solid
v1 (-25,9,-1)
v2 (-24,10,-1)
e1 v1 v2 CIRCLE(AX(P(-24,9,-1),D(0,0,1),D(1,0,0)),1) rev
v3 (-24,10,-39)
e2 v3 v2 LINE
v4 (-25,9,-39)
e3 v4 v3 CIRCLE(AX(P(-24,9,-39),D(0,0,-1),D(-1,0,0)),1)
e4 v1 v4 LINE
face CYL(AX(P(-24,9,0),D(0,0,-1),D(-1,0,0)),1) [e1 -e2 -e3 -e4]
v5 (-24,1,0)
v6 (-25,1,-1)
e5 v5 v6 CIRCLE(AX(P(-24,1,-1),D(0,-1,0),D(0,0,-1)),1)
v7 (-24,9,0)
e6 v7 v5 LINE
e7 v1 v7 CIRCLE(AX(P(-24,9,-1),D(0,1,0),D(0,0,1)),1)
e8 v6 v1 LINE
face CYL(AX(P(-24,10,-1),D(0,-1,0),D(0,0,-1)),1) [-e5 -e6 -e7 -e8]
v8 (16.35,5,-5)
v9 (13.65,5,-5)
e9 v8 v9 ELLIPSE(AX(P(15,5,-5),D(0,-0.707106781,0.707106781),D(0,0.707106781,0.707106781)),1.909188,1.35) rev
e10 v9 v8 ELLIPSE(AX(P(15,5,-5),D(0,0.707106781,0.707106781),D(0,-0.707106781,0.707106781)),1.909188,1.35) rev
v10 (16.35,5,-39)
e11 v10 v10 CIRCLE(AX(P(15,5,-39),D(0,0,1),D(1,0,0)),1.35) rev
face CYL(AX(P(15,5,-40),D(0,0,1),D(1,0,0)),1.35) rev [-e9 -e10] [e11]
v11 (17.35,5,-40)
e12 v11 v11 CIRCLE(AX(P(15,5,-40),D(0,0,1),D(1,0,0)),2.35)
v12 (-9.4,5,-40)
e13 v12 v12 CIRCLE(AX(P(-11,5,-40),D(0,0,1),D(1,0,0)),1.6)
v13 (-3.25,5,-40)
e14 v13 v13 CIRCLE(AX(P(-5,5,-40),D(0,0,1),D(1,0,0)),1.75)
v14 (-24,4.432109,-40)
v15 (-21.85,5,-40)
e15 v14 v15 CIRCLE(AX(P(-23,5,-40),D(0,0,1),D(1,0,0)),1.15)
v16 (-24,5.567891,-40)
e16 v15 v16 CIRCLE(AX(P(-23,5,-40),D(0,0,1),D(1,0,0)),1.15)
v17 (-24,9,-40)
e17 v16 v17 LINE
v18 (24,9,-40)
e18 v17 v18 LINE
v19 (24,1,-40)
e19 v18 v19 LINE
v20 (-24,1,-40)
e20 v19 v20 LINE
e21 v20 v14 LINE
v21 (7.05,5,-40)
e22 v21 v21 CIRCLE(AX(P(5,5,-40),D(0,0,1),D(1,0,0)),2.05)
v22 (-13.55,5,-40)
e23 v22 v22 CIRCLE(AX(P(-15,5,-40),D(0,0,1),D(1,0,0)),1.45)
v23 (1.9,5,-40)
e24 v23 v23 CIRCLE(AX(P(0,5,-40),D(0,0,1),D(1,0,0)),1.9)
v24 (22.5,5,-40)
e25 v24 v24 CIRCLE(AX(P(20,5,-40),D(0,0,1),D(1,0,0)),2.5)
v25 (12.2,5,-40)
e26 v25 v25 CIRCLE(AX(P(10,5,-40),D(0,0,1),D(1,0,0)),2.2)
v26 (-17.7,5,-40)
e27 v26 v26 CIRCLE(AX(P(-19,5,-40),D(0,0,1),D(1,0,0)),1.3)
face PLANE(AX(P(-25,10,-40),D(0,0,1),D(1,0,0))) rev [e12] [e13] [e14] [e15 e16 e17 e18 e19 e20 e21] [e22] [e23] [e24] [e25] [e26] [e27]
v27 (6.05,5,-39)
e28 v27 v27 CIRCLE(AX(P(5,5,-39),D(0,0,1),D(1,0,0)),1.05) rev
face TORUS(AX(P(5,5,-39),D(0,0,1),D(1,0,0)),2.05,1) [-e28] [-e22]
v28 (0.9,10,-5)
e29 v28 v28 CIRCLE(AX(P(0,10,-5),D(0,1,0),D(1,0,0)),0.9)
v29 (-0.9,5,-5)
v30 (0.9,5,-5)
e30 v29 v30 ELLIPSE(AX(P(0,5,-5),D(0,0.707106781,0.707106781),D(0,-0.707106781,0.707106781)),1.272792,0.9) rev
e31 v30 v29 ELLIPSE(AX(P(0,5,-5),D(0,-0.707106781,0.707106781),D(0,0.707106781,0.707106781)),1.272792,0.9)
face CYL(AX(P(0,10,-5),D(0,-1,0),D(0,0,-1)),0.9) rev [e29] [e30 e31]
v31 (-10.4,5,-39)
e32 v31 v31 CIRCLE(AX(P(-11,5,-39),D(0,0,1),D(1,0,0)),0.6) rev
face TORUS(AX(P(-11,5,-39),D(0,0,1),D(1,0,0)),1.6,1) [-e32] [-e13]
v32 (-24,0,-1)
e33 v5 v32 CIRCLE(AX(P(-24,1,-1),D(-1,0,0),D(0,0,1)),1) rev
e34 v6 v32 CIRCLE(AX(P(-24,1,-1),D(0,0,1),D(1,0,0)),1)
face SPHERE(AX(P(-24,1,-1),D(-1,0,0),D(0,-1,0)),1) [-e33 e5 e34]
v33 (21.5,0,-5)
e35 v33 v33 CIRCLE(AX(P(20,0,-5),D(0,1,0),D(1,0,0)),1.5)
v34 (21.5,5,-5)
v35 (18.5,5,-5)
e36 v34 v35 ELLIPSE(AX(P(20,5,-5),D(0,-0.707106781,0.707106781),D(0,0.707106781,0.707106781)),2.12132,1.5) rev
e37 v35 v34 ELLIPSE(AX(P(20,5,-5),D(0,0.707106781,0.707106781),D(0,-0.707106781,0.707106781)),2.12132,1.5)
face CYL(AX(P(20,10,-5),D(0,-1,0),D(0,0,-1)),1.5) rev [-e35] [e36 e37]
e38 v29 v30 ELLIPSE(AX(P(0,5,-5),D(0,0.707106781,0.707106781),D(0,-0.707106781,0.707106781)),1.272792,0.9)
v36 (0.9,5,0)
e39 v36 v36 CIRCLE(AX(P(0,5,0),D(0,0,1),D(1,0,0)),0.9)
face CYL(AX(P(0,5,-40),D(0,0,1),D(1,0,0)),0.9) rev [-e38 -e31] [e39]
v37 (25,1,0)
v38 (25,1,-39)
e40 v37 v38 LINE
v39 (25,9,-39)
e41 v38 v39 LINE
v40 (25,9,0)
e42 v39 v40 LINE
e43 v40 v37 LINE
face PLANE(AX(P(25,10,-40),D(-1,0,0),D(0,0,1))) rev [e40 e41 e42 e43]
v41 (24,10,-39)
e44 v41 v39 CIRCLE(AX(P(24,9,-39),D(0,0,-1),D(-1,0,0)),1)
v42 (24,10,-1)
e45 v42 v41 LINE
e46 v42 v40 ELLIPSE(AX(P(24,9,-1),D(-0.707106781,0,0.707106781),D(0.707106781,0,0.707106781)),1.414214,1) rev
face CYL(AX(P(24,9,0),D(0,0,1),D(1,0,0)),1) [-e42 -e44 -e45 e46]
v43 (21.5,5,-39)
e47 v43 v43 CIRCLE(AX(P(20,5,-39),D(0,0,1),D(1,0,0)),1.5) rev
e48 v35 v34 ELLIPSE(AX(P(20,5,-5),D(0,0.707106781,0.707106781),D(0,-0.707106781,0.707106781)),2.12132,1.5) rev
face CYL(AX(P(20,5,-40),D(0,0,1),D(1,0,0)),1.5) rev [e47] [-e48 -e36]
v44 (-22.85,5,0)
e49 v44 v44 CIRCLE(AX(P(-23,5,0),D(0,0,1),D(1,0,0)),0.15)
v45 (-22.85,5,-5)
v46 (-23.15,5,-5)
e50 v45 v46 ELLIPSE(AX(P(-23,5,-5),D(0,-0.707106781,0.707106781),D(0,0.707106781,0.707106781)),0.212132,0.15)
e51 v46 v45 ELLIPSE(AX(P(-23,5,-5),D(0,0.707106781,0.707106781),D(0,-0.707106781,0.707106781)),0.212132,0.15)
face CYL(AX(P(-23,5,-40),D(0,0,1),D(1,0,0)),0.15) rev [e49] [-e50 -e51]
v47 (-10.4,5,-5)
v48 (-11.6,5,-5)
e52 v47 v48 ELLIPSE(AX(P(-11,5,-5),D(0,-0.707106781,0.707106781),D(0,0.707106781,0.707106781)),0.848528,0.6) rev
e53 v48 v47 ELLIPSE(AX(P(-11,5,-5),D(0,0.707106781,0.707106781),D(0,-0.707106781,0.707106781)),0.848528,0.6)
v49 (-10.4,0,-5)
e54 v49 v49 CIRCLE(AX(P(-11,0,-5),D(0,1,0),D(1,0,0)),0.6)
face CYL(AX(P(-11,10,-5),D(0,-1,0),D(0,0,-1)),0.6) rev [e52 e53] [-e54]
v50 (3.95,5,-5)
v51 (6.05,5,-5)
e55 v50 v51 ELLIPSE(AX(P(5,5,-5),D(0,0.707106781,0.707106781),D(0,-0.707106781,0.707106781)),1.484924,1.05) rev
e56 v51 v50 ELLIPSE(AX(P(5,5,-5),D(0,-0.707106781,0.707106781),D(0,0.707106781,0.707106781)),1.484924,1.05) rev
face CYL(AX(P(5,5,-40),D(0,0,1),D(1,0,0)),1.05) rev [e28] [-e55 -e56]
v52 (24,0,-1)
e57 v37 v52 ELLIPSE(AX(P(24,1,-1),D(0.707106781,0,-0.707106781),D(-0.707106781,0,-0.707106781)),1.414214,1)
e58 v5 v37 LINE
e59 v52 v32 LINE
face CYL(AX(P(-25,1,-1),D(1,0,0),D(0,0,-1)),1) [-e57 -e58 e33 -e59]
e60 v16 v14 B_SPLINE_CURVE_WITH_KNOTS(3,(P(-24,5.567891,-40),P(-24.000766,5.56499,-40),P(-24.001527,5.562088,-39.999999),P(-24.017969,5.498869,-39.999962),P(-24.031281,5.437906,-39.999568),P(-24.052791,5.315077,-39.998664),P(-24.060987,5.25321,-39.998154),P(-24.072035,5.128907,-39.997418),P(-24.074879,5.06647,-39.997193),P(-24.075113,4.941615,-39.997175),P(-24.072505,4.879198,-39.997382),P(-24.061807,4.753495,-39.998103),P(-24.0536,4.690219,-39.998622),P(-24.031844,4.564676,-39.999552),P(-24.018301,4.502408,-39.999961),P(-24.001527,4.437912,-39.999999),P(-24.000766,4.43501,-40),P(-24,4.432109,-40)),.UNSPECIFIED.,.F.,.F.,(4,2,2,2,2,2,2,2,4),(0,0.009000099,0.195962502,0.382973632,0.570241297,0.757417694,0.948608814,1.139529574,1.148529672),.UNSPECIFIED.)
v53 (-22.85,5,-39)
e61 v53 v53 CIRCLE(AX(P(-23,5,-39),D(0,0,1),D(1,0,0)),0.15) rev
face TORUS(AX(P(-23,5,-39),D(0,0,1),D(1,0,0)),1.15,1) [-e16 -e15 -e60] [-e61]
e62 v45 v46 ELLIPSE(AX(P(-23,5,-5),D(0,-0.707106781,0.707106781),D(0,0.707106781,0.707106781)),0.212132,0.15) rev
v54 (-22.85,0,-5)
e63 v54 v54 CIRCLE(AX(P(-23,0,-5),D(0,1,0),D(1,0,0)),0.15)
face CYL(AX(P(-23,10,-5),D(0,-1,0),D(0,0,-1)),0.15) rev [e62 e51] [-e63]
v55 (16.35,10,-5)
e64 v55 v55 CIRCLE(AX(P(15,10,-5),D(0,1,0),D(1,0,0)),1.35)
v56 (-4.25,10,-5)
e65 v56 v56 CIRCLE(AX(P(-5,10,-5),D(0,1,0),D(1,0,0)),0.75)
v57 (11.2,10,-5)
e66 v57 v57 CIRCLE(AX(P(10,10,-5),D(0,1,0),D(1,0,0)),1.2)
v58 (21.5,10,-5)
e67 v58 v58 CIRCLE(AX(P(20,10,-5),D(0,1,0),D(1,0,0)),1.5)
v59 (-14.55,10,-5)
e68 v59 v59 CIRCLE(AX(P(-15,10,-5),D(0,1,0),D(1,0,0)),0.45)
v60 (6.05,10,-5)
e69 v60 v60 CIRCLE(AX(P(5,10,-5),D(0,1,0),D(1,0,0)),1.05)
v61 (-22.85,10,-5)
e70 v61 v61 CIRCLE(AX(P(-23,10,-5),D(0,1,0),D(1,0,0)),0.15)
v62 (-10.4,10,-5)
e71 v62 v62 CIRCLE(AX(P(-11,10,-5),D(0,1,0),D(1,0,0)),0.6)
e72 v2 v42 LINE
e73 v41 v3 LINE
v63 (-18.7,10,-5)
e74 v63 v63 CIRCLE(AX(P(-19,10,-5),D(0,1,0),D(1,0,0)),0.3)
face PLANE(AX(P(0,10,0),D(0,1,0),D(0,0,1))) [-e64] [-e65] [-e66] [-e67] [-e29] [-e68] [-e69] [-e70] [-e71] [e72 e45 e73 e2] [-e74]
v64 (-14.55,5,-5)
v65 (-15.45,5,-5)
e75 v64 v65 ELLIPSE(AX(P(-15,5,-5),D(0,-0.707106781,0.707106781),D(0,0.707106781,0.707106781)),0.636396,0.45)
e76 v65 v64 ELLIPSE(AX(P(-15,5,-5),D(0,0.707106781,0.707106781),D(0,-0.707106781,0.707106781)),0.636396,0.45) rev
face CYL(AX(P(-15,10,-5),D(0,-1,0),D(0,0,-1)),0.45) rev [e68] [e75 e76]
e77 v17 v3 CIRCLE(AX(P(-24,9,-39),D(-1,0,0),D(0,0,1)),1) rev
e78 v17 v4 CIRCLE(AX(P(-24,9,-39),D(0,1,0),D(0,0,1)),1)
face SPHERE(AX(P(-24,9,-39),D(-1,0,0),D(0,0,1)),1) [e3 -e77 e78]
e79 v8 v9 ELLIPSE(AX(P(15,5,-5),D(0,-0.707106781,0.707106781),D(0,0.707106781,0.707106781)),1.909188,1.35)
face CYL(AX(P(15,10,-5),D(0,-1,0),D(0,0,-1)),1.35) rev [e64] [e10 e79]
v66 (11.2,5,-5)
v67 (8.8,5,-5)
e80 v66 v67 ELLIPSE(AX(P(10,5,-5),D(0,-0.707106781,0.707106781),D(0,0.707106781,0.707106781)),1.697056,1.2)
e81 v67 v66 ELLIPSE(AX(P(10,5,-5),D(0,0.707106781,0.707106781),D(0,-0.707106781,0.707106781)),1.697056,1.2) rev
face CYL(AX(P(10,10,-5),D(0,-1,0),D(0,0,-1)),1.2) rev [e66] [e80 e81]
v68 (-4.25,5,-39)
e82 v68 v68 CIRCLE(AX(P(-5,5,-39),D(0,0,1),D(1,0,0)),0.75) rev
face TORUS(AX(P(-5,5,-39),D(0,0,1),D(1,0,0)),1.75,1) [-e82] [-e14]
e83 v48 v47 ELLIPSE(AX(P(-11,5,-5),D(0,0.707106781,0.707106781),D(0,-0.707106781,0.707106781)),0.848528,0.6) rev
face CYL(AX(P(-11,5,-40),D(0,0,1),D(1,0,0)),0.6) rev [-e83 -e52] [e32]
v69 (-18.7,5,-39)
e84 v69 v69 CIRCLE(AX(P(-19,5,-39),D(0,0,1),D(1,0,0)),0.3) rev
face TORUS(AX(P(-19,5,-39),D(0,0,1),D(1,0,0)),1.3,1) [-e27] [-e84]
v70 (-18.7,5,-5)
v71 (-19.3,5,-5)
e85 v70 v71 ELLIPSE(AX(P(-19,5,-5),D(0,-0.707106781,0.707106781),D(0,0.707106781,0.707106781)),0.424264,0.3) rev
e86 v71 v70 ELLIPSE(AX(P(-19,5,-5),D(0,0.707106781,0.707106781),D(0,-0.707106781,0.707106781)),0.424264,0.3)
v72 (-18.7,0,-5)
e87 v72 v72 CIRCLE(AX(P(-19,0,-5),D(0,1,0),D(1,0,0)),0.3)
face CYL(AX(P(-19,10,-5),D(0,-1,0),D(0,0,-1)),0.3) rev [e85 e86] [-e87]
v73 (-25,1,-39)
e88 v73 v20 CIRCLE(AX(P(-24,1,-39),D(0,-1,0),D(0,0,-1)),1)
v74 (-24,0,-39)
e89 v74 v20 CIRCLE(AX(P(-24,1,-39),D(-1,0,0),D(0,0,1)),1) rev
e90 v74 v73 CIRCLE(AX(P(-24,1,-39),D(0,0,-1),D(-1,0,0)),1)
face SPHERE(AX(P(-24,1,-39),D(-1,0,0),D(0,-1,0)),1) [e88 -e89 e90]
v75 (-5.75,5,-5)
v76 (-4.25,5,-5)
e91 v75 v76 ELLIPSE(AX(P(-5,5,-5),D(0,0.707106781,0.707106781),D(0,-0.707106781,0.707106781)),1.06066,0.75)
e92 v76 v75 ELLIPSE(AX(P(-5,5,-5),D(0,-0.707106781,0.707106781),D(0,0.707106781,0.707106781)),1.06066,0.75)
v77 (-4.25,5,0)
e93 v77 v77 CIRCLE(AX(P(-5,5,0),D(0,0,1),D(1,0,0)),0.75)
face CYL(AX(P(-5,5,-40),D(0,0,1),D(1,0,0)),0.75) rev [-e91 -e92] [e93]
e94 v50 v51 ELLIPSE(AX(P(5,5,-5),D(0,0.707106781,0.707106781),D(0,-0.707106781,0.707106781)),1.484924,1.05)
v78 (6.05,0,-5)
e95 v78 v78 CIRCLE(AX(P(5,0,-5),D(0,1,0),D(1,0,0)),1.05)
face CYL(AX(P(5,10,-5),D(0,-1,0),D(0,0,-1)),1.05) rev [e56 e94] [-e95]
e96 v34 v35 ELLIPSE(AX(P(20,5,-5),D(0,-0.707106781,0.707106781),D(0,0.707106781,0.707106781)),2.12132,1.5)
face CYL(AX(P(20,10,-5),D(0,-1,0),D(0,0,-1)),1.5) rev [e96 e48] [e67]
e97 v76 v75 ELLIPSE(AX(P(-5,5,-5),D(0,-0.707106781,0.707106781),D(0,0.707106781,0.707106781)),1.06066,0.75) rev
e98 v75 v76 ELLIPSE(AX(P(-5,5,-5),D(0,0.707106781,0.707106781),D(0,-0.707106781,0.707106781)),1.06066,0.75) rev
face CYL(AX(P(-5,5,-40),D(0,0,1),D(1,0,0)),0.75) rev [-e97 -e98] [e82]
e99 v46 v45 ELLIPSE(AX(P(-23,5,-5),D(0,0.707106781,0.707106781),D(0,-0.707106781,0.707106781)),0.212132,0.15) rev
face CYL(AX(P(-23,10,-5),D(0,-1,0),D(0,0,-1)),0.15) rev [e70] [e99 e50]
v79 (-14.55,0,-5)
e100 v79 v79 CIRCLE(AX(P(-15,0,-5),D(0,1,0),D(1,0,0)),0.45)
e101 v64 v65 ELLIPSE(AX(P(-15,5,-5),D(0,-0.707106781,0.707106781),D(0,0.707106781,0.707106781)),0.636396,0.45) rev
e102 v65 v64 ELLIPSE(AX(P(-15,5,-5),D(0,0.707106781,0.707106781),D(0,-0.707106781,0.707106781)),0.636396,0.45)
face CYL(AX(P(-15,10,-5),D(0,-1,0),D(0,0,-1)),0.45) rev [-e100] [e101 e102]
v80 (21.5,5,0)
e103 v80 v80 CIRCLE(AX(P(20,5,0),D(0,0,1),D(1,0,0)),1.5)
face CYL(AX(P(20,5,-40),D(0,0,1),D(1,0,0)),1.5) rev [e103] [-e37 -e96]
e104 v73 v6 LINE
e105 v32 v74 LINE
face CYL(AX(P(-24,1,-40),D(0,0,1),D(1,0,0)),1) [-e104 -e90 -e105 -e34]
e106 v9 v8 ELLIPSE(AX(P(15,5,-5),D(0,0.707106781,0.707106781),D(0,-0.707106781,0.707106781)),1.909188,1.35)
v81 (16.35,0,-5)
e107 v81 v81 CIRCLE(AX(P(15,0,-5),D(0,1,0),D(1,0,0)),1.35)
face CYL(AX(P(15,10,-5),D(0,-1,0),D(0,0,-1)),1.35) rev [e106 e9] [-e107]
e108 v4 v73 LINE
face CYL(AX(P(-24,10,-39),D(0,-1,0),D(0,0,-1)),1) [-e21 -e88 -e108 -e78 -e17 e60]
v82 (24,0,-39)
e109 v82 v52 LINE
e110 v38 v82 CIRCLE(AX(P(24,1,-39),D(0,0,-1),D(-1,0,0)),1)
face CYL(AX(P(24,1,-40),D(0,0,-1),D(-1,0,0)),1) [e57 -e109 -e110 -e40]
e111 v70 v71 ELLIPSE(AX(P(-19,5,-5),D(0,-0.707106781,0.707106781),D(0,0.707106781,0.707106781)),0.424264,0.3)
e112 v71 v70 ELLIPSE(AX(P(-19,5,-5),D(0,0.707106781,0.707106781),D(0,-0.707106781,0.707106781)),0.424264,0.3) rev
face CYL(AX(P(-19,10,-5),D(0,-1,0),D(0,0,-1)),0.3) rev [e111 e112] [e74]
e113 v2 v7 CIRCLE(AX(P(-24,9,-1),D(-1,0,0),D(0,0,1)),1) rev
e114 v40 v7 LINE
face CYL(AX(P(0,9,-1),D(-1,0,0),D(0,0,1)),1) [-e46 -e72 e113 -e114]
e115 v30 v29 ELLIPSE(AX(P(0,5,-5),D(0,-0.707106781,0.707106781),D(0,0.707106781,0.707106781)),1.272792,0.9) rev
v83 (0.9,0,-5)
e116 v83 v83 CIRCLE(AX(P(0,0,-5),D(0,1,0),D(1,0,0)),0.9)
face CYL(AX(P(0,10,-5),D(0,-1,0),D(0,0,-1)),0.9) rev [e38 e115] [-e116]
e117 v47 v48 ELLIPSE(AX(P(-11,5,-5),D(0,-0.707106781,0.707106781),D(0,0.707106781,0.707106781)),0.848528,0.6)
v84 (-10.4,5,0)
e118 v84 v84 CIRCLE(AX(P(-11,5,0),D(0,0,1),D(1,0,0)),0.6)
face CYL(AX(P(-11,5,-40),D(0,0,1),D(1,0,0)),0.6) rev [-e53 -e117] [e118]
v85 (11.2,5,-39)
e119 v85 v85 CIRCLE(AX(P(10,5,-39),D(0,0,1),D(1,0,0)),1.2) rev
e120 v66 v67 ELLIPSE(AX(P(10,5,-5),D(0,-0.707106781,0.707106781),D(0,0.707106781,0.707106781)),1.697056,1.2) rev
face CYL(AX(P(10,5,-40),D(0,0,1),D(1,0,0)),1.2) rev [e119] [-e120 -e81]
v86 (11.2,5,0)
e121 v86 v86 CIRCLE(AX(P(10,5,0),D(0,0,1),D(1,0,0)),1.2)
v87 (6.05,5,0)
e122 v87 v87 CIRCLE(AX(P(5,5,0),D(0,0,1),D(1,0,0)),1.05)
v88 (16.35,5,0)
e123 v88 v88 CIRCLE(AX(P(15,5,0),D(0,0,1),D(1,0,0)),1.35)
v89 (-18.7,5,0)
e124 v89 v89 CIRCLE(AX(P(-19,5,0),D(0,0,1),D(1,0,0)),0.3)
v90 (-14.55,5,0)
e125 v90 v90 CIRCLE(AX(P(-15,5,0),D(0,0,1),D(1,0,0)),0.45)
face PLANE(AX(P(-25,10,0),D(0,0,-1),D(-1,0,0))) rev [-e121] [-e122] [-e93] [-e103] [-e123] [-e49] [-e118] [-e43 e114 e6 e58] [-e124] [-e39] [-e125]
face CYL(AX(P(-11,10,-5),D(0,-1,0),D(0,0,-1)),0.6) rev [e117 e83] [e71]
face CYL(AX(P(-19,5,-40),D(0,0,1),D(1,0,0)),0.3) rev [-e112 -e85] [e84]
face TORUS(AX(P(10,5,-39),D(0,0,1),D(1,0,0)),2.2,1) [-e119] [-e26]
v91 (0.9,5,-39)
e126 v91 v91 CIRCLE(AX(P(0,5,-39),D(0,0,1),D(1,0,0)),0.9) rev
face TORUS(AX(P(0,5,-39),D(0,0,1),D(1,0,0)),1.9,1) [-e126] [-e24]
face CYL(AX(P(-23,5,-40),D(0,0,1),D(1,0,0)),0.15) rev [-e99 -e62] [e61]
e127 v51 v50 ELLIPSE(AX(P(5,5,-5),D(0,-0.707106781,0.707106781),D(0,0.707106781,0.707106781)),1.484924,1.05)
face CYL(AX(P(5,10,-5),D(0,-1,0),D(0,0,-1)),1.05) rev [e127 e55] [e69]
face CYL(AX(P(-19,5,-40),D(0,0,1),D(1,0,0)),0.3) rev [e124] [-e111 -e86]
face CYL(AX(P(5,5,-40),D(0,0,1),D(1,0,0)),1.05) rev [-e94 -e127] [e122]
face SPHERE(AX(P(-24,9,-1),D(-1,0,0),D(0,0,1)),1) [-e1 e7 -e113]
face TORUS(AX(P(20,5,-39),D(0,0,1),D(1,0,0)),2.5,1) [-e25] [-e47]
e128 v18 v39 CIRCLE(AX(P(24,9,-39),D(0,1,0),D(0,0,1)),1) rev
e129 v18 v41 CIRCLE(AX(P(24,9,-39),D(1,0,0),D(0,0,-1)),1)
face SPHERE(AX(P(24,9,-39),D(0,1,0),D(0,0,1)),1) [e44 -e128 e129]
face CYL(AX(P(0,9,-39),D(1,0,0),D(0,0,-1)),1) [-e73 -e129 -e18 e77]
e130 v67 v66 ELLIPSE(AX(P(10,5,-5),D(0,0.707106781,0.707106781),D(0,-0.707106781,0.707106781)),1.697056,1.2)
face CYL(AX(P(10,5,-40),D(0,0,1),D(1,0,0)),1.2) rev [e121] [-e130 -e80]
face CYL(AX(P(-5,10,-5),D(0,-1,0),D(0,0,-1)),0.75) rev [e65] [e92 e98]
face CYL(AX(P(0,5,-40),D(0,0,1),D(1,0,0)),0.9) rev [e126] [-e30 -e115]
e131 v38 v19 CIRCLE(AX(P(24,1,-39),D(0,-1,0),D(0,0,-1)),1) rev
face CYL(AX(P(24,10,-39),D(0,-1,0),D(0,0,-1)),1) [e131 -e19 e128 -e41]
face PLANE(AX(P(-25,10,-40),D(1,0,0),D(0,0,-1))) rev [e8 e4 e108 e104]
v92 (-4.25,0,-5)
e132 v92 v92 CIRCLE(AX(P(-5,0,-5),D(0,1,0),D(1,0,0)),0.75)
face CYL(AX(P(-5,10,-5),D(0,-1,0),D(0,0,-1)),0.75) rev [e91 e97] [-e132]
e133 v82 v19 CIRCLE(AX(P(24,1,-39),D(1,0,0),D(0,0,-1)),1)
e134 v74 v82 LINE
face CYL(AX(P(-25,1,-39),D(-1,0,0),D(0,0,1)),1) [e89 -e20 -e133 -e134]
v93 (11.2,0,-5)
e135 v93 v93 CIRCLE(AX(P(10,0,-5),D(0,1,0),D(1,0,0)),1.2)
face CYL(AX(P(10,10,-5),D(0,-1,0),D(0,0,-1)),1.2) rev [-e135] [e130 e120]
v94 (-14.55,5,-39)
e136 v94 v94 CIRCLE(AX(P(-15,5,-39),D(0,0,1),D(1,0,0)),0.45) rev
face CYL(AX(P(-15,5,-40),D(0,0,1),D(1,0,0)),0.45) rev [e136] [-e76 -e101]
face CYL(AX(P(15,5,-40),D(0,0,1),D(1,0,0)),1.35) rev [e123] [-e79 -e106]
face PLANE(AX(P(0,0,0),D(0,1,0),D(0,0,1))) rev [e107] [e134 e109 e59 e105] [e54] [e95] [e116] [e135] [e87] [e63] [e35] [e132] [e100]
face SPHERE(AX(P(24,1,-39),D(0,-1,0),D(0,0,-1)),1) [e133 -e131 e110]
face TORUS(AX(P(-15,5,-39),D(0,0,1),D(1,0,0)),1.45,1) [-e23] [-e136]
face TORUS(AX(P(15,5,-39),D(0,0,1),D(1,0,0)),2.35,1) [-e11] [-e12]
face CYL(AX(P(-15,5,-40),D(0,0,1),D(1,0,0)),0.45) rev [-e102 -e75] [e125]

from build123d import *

# Parameters (mm, degrees)
SKETCH1_W                 = 50
SKETCH1_H                 = 40
BOSS_EXTRUDE1_DEPTH       = 10
CUT_EXTRUDE1_START        = -40
CUT_EXTRUDE1_OUTLINE_R    = 0.3
CUT_EXTRUDE1_OUTLINE_R_2  = 0.45
CUT_EXTRUDE1_OUTLINE_R_3  = 0.6
CUT_EXTRUDE1_OUTLINE_R_4  = 0.75
CUT_EXTRUDE1_OUTLINE_R_5  = 0.9
CUT_EXTRUDE1_OUTLINE_R_6  = 1.05
CUT_EXTRUDE1_OUTLINE_R_7  = 1.35
CUT_EXTRUDE1_OUTLINE_R_8  = 1.5
CUT_EXTRUDE1_OUTLINE_R_9  = 1.2
CUT_EXTRUDE1_OUTLINE_R_10 = 0.15
CUT_EXTRUDE1_DEPTH        = 40
FILLET1_R                 = 1


# Read off the part's stored shape, not the designer's step: Cut-Extrude1
with BuildPart() as part:
    # Sketch1 → Boss-Extrude1 (new body)
    with BuildSketch(Plane(origin=(0, 0, 0), x_dir=(1, 0, 0), z_dir=(0, 1, 0))):
        with Locations((0, 20)):
            Rectangle(SKETCH1_W, SKETCH1_H)
    extrude(amount=BOSS_EXTRUDE1_DEPTH)

    # Cut-Extrude1 outline → Cut-Extrude1 (cut)
    with BuildSketch(Plane.XY.offset(CUT_EXTRUDE1_START)):
        with Locations((-19, 5)):
            Circle(CUT_EXTRUDE1_OUTLINE_R)
        with Locations((-15, 5)):
            Circle(CUT_EXTRUDE1_OUTLINE_R_2)
        with Locations((-11, 5)):
            Circle(CUT_EXTRUDE1_OUTLINE_R_3)
        with Locations((-5, 5)):
            Circle(CUT_EXTRUDE1_OUTLINE_R_4)
        with Locations((0, 5)):
            Circle(CUT_EXTRUDE1_OUTLINE_R_5)
        with Locations((5, 5)):
            Circle(CUT_EXTRUDE1_OUTLINE_R_6)
        with Locations((15, 5)):
            Circle(CUT_EXTRUDE1_OUTLINE_R_7)
        with Locations((20, 5)):
            Circle(CUT_EXTRUDE1_OUTLINE_R_8)
        with Locations((10, 5)):
            Circle(CUT_EXTRUDE1_OUTLINE_R_9)
        with Locations((-23, 5)):
            Circle(CUT_EXTRUDE1_OUTLINE_R_10)
    cut_extrude1 = extrude(amount=CUT_EXTRUDE1_DEPTH, mode=Mode.SUBTRACT)

    # Mirror1: Cut-Extrude1 across plane
    add(cut_extrude1.mirror(Plane(origin=(0, 0, 0), x_dir=(0, -0.7071067811865478, 0.7071067811865472), z_dir=(0, 0.7071067811865475, 0.7071067811865477))), mode=Mode.SUBTRACT)

    # Fillet1
    # the kernel refuses this fillet: 1 mm, written as the material it takes off along each edge
    with BuildSketch(Plane(origin=(24, 9, -39), x_dir=(0, 1, 0), z_dir=(0, 0, -1))) as fillet1_piece_1_section:
        Polygon((0, 0), (FILLET1_R, 0), (FILLET1_R, FILLET1_R), (0, FILLET1_R), align=None)
    fillet1_piece_1 = extrude(amount=FILLET1_R, mode=Mode.PRIVATE)
    fillet1_piece_1 = fillet1_piece_1 - Plane(origin=(24, 9, -39), x_dir=(-0.7071067811865475, -0.7071067811865475, 0), z_dir=(0, 0, -1)) * Sphere(FILLET1_R, mode=Mode.PRIVATE)
    add(fillet1_piece_1, mode=Mode.SUBTRACT)
    with BuildSketch(Plane(origin=(-24, 9, -39), x_dir=(-1, 0, 0), z_dir=(0, 0, -1))) as fillet1_piece_2_section:
        Polygon((0, 0), (FILLET1_R, 0), (FILLET1_R, FILLET1_R), (0, FILLET1_R), align=None)
    fillet1_piece_2 = extrude(amount=FILLET1_R, mode=Mode.PRIVATE)
    fillet1_piece_2 = fillet1_piece_2 - Plane(origin=(-24, 9, -39), x_dir=(0.7071067811865475, -0.7071067811865475, 0), z_dir=(0, 0, -1)) * Sphere(FILLET1_R, mode=Mode.PRIVATE)
    add(fillet1_piece_2, mode=Mode.SUBTRACT)
    with BuildSketch(Plane(origin=(-24, 9, -1), x_dir=(0, 1, 0), z_dir=(-1, 0, 0))) as fillet1_piece_3_section:
        Polygon((0, 0), (FILLET1_R, 0), (FILLET1_R, -FILLET1_R), (0, -FILLET1_R), align=None)
    fillet1_piece_3 = extrude(amount=FILLET1_R, mode=Mode.PRIVATE)
    fillet1_piece_3 = fillet1_piece_3 - Plane(origin=(-24, 9, -1), x_dir=(0, -0.7071067811865475, -0.7071067811865475), z_dir=(-1, 0, 0)) * Sphere(FILLET1_R, mode=Mode.PRIVATE)
    add(fillet1_piece_3, mode=Mode.SUBTRACT)
    with BuildSketch(Plane(origin=(-24, 1, -39), x_dir=(-1, 0, 0), z_dir=(0, 0, -1))) as fillet1_piece_4_section:
        Polygon((0, 0), (FILLET1_R, 0), (FILLET1_R, -FILLET1_R), (0, -FILLET1_R), align=None)
    fillet1_piece_4 = extrude(amount=FILLET1_R, mode=Mode.PRIVATE)
    fillet1_piece_4 = fillet1_piece_4 - Plane(origin=(-24, 1, -39), x_dir=(0.7071067811865475, 0.7071067811865475, 0), z_dir=(0, 0, -1)) * Sphere(FILLET1_R, mode=Mode.PRIVATE)
    add(fillet1_piece_4, mode=Mode.SUBTRACT)
    with BuildSketch(Plane(origin=(24, 1, -39), x_dir=(0, -1, 0), z_dir=(0, 0, -1))) as fillet1_piece_5_section:
        Polygon((0, 0), (FILLET1_R, 0), (FILLET1_R, -FILLET1_R), (0, -FILLET1_R), align=None)
    fillet1_piece_5 = extrude(amount=FILLET1_R, mode=Mode.PRIVATE)
    fillet1_piece_5 = fillet1_piece_5 - Plane(origin=(24, 1, -39), x_dir=(-0.7071067811865475, 0.7071067811865475, 0), z_dir=(0, 0, -1)) * Sphere(FILLET1_R, mode=Mode.PRIVATE)
    add(fillet1_piece_5, mode=Mode.SUBTRACT)
    with BuildSketch(Plane(origin=(-24, 1, -1), x_dir=(0, -1, 0), z_dir=(-1, 0, 0))) as fillet1_piece_6_section:
        Polygon((0, 0), (FILLET1_R, 0), (FILLET1_R, FILLET1_R), (0, FILLET1_R), align=None)
    fillet1_piece_6 = extrude(amount=FILLET1_R, mode=Mode.PRIVATE)
    fillet1_piece_6 = fillet1_piece_6 - Plane(origin=(-24, 1, -1), x_dir=(0, 0.7071067811865475, -0.7071067811865475), z_dir=(-1, 0, 0)) * Sphere(FILLET1_R, mode=Mode.PRIVATE)
    add(fillet1_piece_6, mode=Mode.SUBTRACT)
    with BuildSketch(Plane(origin=(25, 10, -39), x_dir=(-1, 0, 0), z_dir=(0, 0, 1))) as fillet1_piece_7:
        with BuildLine():
            CenterArc((FILLET1_R, FILLET1_R), FILLET1_R, 180, 90)
            Line((0, FILLET1_R), (0, 0))
            Line((0, 0), (FILLET1_R, 0))
        make_face()
    extrude(amount=41.5, mode=Mode.SUBTRACT)
    with BuildSketch(Plane(origin=(-24, 10, -40), x_dir=(0, -1, 0), z_dir=(1, 0, 0))) as fillet1_piece_8:
        with BuildLine():
            CenterArc((FILLET1_R, -FILLET1_R), FILLET1_R, 90, 90)
            Line((0, -FILLET1_R), (0, 0))
            Line((0, 0), (FILLET1_R, 0))
        make_face()
    extrude(amount=48, mode=Mode.SUBTRACT)
    with BuildSketch(Plane(origin=(-23, 5, -40), x_dir=(1, 0, 0), z_dir=(0, -1, 0))) as fillet1_piece_9:
        with BuildLine():
            CenterArc((0.15 + FILLET1_R, FILLET1_R), FILLET1_R, 180, 90)
            Line((0.15, FILLET1_R), (0.15, 0))
            Line((0.15, 0), (0.15 + FILLET1_R, 0))
        make_face()
    revolve(axis=Axis((-23, 5, -40), (0, 0, 1)), mode=Mode.SUBTRACT)
    with BuildSketch(Plane(origin=(10, 5, -40), x_dir=(1, 0, 0), z_dir=(0, -1, 0))) as fillet1_piece_10:
        with BuildLine():
            CenterArc((1.2 + FILLET1_R, FILLET1_R), FILLET1_R, 180, 90)
            Line((1.2, FILLET1_R), (1.2, 0))
            Line((1.2, 0), (1.2 + FILLET1_R, 0))
        make_face()
    revolve(axis=Axis((10, 5, -40), (0, 0, 1)), mode=Mode.SUBTRACT)
    with BuildSketch(Plane(origin=(20, 5, -40), x_dir=(1, 0, 0), z_dir=(0, -1, 0))) as fillet1_piece_11:
        with BuildLine():
            CenterArc((1.5 + FILLET1_R, FILLET1_R), FILLET1_R, 180, 90)
            Line((1.5, FILLET1_R), (1.5, 0))
            Line((1.5, 0), (1.5 + FILLET1_R, 0))
        make_face()
    revolve(axis=Axis((20, 5, -40), (0, 0, 1)), mode=Mode.SUBTRACT)
    with BuildSketch(Plane(origin=(15, 5, -40), x_dir=(1, 0, 0), z_dir=(0, -1, 0))) as fillet1_piece_12:
        with BuildLine():
            CenterArc((1.35 + FILLET1_R, FILLET1_R), FILLET1_R, 180, 90)
            Line((1.35, FILLET1_R), (1.35, 0))
            Line((1.35, 0), (1.35 + FILLET1_R, 0))
        make_face()
    revolve(axis=Axis((15, 5, -40), (0, 0, 1)), mode=Mode.SUBTRACT)
    with BuildSketch(Plane(origin=(5, 5, -40), x_dir=(1, 0, 0), z_dir=(0, -1, 0))) as fillet1_piece_13:
        with BuildLine():
            CenterArc((1.05 + FILLET1_R, FILLET1_R), FILLET1_R, 180, 90)
            Line((1.05, FILLET1_R), (1.05, 0))
            Line((1.05, 0), (1.05 + FILLET1_R, 0))
        make_face()
    revolve(axis=Axis((5, 5, -40), (0, 0, 1)), mode=Mode.SUBTRACT)
    with BuildSketch(Plane(origin=(0, 5, -40), x_dir=(1, 0, 0), z_dir=(0, -1, 0))) as fillet1_piece_14:
        with BuildLine():
            CenterArc((0.9 + FILLET1_R, FILLET1_R), FILLET1_R, 180, 90)
            Line((0.9, FILLET1_R), (0.9, 0))
            Line((0.9, 0), (0.9 + FILLET1_R, 0))
        make_face()
    revolve(axis=Axis((0, 5, -40), (0, 0, 1)), mode=Mode.SUBTRACT)
    with BuildSketch(Plane(origin=(-5, 5, -40), x_dir=(1, 0, 0), z_dir=(0, -1, 0))) as fillet1_piece_15:
        with BuildLine():
            CenterArc((0.75 + FILLET1_R, FILLET1_R), FILLET1_R, 180, 90)
            Line((0.75, FILLET1_R), (0.75, 0))
            Line((0.75, 0), (0.75 + FILLET1_R, 0))
        make_face()
    revolve(axis=Axis((-5, 5, -40), (0, 0, 1)), mode=Mode.SUBTRACT)
    with BuildSketch(Plane(origin=(-11, 5, -40), x_dir=(1, 0, 0), z_dir=(0, -1, 0))) as fillet1_piece_16:
        with BuildLine():
            CenterArc((0.6 + FILLET1_R, FILLET1_R), FILLET1_R, 180, 90)
            Line((0.6, FILLET1_R), (0.6, 0))
            Line((0.6, 0), (0.6 + FILLET1_R, 0))
        make_face()
    revolve(axis=Axis((-11, 5, -40), (0, 0, 1)), mode=Mode.SUBTRACT)
    with BuildSketch(Plane(origin=(-15, 5, -40), x_dir=(1, 0, 0), z_dir=(0, -1, 0))) as fillet1_piece_17:
        with BuildLine():
            CenterArc((0.45 + FILLET1_R, FILLET1_R), FILLET1_R, 180, 90)
            Line((0.45, FILLET1_R), (0.45, 0))
            Line((0.45, 0), (0.45 + FILLET1_R, 0))
        make_face()
    revolve(axis=Axis((-15, 5, -40), (0, 0, 1)), mode=Mode.SUBTRACT)
    with BuildSketch(Plane(origin=(-19, 5, -40), x_dir=(1, 0, 0), z_dir=(0, -1, 0))) as fillet1_piece_18:
        with BuildLine():
            CenterArc((0.3 + FILLET1_R, FILLET1_R), FILLET1_R, 180, 90)
            Line((0.3, FILLET1_R), (0.3, 0))
            Line((0.3, 0), (0.3 + FILLET1_R, 0))
        make_face()
    revolve(axis=Axis((-19, 5, -40), (0, 0, 1)), mode=Mode.SUBTRACT)
    with BuildSketch(Plane(origin=(-25, 10, -1), x_dir=(0, -1, 0), z_dir=(0, 0, -1))) as fillet1_piece_19:
        with BuildLine():
            CenterArc((FILLET1_R, -FILLET1_R), FILLET1_R, 90, 90)
            Line((0, -FILLET1_R), (0, 0))
            Line((0, 0), (FILLET1_R, 0))
        make_face()
    extrude(amount=38, mode=Mode.SUBTRACT)
    with BuildSketch(Plane(origin=(-24, 0, -40), x_dir=(0, 1, 0), z_dir=(1, 0, 0))) as fillet1_piece_20:
        with BuildLine():
            CenterArc((FILLET1_R, FILLET1_R), FILLET1_R, 180, 90)
            Line((0, FILLET1_R), (0, 0))
            Line((0, 0), (FILLET1_R, 0))
        make_face()
    extrude(amount=48, mode=Mode.SUBTRACT)
    with BuildSketch(Plane(origin=(25, 0, -39), x_dir=(-1, 0, 0), z_dir=(0, 0, 1))) as fillet1_piece_21:
        with BuildLine():
            CenterArc((FILLET1_R, -FILLET1_R), FILLET1_R, 90, 90)
            Line((0, -FILLET1_R), (0, 0))
            Line((0, 0), (FILLET1_R, 0))
        make_face()
    extrude(amount=41.5, mode=Mode.SUBTRACT)
    with BuildSketch(Plane(origin=(27.5, 0, 0), x_dir=(0, 0, -1), z_dir=(-1, 0, 0))) as fillet1_piece_22:
        with BuildLine():
            CenterArc((FILLET1_R, -FILLET1_R), FILLET1_R, 90, 90)
            Line((0, -FILLET1_R), (0, 0))
            Line((0, 0), (FILLET1_R, 0))
        make_face()
    extrude(amount=51.5, mode=Mode.SUBTRACT)
    with BuildSketch(Plane(origin=(-25, 0, -1), x_dir=(0, 1, 0), z_dir=(0, 0, -1))) as fillet1_piece_23:
        with BuildLine():
            CenterArc((FILLET1_R, FILLET1_R), FILLET1_R, 180, 90)
            Line((0, FILLET1_R), (0, 0))
            Line((0, 0), (FILLET1_R, 0))
        make_face()
    extrude(amount=38, mode=Mode.SUBTRACT)
    with BuildSketch(Plane(origin=(-25, 1, -40), x_dir=(1, 0, 0), z_dir=(0, 1, 0)), Plane(origin=(-25, 1, 0), x_dir=(0, 0, -1), z_dir=(0, 1, 0))) as fillet1_piece_24:
        with BuildLine():
            CenterArc((FILLET1_R, -FILLET1_R), FILLET1_R, 90, 90)
            Line((0, -FILLET1_R), (0, 0))
            Line((0, 0), (FILLET1_R, 0))
        make_face()
    extrude(amount=8, mode=Mode.SUBTRACT)
    with BuildSketch(Plane(origin=(25, 1, -40), x_dir=(-1, 0, 0), z_dir=(0, 1, 0))) as fillet1_piece_25:
        with BuildLine():
            CenterArc((FILLET1_R, FILLET1_R), FILLET1_R, 180, 90)
            Line((0, FILLET1_R), (0, 0))
            Line((0, 0), (FILLET1_R, 0))
        make_face()
    extrude(amount=8, mode=Mode.SUBTRACT)
    with BuildSketch(Plane(origin=(27.5, 10, 0), x_dir=(0, 0, -1), z_dir=(-1, 0, 0))) as fillet1_piece_26:
        with BuildLine():
            CenterArc((FILLET1_R, FILLET1_R), FILLET1_R, 180, 90)
            Line((0, FILLET1_R), (0, 0))
            Line((0, 0), (FILLET1_R, 0))
        make_face()
    extrude(amount=51.5, mode=Mode.SUBTRACT)


solid = part.part
